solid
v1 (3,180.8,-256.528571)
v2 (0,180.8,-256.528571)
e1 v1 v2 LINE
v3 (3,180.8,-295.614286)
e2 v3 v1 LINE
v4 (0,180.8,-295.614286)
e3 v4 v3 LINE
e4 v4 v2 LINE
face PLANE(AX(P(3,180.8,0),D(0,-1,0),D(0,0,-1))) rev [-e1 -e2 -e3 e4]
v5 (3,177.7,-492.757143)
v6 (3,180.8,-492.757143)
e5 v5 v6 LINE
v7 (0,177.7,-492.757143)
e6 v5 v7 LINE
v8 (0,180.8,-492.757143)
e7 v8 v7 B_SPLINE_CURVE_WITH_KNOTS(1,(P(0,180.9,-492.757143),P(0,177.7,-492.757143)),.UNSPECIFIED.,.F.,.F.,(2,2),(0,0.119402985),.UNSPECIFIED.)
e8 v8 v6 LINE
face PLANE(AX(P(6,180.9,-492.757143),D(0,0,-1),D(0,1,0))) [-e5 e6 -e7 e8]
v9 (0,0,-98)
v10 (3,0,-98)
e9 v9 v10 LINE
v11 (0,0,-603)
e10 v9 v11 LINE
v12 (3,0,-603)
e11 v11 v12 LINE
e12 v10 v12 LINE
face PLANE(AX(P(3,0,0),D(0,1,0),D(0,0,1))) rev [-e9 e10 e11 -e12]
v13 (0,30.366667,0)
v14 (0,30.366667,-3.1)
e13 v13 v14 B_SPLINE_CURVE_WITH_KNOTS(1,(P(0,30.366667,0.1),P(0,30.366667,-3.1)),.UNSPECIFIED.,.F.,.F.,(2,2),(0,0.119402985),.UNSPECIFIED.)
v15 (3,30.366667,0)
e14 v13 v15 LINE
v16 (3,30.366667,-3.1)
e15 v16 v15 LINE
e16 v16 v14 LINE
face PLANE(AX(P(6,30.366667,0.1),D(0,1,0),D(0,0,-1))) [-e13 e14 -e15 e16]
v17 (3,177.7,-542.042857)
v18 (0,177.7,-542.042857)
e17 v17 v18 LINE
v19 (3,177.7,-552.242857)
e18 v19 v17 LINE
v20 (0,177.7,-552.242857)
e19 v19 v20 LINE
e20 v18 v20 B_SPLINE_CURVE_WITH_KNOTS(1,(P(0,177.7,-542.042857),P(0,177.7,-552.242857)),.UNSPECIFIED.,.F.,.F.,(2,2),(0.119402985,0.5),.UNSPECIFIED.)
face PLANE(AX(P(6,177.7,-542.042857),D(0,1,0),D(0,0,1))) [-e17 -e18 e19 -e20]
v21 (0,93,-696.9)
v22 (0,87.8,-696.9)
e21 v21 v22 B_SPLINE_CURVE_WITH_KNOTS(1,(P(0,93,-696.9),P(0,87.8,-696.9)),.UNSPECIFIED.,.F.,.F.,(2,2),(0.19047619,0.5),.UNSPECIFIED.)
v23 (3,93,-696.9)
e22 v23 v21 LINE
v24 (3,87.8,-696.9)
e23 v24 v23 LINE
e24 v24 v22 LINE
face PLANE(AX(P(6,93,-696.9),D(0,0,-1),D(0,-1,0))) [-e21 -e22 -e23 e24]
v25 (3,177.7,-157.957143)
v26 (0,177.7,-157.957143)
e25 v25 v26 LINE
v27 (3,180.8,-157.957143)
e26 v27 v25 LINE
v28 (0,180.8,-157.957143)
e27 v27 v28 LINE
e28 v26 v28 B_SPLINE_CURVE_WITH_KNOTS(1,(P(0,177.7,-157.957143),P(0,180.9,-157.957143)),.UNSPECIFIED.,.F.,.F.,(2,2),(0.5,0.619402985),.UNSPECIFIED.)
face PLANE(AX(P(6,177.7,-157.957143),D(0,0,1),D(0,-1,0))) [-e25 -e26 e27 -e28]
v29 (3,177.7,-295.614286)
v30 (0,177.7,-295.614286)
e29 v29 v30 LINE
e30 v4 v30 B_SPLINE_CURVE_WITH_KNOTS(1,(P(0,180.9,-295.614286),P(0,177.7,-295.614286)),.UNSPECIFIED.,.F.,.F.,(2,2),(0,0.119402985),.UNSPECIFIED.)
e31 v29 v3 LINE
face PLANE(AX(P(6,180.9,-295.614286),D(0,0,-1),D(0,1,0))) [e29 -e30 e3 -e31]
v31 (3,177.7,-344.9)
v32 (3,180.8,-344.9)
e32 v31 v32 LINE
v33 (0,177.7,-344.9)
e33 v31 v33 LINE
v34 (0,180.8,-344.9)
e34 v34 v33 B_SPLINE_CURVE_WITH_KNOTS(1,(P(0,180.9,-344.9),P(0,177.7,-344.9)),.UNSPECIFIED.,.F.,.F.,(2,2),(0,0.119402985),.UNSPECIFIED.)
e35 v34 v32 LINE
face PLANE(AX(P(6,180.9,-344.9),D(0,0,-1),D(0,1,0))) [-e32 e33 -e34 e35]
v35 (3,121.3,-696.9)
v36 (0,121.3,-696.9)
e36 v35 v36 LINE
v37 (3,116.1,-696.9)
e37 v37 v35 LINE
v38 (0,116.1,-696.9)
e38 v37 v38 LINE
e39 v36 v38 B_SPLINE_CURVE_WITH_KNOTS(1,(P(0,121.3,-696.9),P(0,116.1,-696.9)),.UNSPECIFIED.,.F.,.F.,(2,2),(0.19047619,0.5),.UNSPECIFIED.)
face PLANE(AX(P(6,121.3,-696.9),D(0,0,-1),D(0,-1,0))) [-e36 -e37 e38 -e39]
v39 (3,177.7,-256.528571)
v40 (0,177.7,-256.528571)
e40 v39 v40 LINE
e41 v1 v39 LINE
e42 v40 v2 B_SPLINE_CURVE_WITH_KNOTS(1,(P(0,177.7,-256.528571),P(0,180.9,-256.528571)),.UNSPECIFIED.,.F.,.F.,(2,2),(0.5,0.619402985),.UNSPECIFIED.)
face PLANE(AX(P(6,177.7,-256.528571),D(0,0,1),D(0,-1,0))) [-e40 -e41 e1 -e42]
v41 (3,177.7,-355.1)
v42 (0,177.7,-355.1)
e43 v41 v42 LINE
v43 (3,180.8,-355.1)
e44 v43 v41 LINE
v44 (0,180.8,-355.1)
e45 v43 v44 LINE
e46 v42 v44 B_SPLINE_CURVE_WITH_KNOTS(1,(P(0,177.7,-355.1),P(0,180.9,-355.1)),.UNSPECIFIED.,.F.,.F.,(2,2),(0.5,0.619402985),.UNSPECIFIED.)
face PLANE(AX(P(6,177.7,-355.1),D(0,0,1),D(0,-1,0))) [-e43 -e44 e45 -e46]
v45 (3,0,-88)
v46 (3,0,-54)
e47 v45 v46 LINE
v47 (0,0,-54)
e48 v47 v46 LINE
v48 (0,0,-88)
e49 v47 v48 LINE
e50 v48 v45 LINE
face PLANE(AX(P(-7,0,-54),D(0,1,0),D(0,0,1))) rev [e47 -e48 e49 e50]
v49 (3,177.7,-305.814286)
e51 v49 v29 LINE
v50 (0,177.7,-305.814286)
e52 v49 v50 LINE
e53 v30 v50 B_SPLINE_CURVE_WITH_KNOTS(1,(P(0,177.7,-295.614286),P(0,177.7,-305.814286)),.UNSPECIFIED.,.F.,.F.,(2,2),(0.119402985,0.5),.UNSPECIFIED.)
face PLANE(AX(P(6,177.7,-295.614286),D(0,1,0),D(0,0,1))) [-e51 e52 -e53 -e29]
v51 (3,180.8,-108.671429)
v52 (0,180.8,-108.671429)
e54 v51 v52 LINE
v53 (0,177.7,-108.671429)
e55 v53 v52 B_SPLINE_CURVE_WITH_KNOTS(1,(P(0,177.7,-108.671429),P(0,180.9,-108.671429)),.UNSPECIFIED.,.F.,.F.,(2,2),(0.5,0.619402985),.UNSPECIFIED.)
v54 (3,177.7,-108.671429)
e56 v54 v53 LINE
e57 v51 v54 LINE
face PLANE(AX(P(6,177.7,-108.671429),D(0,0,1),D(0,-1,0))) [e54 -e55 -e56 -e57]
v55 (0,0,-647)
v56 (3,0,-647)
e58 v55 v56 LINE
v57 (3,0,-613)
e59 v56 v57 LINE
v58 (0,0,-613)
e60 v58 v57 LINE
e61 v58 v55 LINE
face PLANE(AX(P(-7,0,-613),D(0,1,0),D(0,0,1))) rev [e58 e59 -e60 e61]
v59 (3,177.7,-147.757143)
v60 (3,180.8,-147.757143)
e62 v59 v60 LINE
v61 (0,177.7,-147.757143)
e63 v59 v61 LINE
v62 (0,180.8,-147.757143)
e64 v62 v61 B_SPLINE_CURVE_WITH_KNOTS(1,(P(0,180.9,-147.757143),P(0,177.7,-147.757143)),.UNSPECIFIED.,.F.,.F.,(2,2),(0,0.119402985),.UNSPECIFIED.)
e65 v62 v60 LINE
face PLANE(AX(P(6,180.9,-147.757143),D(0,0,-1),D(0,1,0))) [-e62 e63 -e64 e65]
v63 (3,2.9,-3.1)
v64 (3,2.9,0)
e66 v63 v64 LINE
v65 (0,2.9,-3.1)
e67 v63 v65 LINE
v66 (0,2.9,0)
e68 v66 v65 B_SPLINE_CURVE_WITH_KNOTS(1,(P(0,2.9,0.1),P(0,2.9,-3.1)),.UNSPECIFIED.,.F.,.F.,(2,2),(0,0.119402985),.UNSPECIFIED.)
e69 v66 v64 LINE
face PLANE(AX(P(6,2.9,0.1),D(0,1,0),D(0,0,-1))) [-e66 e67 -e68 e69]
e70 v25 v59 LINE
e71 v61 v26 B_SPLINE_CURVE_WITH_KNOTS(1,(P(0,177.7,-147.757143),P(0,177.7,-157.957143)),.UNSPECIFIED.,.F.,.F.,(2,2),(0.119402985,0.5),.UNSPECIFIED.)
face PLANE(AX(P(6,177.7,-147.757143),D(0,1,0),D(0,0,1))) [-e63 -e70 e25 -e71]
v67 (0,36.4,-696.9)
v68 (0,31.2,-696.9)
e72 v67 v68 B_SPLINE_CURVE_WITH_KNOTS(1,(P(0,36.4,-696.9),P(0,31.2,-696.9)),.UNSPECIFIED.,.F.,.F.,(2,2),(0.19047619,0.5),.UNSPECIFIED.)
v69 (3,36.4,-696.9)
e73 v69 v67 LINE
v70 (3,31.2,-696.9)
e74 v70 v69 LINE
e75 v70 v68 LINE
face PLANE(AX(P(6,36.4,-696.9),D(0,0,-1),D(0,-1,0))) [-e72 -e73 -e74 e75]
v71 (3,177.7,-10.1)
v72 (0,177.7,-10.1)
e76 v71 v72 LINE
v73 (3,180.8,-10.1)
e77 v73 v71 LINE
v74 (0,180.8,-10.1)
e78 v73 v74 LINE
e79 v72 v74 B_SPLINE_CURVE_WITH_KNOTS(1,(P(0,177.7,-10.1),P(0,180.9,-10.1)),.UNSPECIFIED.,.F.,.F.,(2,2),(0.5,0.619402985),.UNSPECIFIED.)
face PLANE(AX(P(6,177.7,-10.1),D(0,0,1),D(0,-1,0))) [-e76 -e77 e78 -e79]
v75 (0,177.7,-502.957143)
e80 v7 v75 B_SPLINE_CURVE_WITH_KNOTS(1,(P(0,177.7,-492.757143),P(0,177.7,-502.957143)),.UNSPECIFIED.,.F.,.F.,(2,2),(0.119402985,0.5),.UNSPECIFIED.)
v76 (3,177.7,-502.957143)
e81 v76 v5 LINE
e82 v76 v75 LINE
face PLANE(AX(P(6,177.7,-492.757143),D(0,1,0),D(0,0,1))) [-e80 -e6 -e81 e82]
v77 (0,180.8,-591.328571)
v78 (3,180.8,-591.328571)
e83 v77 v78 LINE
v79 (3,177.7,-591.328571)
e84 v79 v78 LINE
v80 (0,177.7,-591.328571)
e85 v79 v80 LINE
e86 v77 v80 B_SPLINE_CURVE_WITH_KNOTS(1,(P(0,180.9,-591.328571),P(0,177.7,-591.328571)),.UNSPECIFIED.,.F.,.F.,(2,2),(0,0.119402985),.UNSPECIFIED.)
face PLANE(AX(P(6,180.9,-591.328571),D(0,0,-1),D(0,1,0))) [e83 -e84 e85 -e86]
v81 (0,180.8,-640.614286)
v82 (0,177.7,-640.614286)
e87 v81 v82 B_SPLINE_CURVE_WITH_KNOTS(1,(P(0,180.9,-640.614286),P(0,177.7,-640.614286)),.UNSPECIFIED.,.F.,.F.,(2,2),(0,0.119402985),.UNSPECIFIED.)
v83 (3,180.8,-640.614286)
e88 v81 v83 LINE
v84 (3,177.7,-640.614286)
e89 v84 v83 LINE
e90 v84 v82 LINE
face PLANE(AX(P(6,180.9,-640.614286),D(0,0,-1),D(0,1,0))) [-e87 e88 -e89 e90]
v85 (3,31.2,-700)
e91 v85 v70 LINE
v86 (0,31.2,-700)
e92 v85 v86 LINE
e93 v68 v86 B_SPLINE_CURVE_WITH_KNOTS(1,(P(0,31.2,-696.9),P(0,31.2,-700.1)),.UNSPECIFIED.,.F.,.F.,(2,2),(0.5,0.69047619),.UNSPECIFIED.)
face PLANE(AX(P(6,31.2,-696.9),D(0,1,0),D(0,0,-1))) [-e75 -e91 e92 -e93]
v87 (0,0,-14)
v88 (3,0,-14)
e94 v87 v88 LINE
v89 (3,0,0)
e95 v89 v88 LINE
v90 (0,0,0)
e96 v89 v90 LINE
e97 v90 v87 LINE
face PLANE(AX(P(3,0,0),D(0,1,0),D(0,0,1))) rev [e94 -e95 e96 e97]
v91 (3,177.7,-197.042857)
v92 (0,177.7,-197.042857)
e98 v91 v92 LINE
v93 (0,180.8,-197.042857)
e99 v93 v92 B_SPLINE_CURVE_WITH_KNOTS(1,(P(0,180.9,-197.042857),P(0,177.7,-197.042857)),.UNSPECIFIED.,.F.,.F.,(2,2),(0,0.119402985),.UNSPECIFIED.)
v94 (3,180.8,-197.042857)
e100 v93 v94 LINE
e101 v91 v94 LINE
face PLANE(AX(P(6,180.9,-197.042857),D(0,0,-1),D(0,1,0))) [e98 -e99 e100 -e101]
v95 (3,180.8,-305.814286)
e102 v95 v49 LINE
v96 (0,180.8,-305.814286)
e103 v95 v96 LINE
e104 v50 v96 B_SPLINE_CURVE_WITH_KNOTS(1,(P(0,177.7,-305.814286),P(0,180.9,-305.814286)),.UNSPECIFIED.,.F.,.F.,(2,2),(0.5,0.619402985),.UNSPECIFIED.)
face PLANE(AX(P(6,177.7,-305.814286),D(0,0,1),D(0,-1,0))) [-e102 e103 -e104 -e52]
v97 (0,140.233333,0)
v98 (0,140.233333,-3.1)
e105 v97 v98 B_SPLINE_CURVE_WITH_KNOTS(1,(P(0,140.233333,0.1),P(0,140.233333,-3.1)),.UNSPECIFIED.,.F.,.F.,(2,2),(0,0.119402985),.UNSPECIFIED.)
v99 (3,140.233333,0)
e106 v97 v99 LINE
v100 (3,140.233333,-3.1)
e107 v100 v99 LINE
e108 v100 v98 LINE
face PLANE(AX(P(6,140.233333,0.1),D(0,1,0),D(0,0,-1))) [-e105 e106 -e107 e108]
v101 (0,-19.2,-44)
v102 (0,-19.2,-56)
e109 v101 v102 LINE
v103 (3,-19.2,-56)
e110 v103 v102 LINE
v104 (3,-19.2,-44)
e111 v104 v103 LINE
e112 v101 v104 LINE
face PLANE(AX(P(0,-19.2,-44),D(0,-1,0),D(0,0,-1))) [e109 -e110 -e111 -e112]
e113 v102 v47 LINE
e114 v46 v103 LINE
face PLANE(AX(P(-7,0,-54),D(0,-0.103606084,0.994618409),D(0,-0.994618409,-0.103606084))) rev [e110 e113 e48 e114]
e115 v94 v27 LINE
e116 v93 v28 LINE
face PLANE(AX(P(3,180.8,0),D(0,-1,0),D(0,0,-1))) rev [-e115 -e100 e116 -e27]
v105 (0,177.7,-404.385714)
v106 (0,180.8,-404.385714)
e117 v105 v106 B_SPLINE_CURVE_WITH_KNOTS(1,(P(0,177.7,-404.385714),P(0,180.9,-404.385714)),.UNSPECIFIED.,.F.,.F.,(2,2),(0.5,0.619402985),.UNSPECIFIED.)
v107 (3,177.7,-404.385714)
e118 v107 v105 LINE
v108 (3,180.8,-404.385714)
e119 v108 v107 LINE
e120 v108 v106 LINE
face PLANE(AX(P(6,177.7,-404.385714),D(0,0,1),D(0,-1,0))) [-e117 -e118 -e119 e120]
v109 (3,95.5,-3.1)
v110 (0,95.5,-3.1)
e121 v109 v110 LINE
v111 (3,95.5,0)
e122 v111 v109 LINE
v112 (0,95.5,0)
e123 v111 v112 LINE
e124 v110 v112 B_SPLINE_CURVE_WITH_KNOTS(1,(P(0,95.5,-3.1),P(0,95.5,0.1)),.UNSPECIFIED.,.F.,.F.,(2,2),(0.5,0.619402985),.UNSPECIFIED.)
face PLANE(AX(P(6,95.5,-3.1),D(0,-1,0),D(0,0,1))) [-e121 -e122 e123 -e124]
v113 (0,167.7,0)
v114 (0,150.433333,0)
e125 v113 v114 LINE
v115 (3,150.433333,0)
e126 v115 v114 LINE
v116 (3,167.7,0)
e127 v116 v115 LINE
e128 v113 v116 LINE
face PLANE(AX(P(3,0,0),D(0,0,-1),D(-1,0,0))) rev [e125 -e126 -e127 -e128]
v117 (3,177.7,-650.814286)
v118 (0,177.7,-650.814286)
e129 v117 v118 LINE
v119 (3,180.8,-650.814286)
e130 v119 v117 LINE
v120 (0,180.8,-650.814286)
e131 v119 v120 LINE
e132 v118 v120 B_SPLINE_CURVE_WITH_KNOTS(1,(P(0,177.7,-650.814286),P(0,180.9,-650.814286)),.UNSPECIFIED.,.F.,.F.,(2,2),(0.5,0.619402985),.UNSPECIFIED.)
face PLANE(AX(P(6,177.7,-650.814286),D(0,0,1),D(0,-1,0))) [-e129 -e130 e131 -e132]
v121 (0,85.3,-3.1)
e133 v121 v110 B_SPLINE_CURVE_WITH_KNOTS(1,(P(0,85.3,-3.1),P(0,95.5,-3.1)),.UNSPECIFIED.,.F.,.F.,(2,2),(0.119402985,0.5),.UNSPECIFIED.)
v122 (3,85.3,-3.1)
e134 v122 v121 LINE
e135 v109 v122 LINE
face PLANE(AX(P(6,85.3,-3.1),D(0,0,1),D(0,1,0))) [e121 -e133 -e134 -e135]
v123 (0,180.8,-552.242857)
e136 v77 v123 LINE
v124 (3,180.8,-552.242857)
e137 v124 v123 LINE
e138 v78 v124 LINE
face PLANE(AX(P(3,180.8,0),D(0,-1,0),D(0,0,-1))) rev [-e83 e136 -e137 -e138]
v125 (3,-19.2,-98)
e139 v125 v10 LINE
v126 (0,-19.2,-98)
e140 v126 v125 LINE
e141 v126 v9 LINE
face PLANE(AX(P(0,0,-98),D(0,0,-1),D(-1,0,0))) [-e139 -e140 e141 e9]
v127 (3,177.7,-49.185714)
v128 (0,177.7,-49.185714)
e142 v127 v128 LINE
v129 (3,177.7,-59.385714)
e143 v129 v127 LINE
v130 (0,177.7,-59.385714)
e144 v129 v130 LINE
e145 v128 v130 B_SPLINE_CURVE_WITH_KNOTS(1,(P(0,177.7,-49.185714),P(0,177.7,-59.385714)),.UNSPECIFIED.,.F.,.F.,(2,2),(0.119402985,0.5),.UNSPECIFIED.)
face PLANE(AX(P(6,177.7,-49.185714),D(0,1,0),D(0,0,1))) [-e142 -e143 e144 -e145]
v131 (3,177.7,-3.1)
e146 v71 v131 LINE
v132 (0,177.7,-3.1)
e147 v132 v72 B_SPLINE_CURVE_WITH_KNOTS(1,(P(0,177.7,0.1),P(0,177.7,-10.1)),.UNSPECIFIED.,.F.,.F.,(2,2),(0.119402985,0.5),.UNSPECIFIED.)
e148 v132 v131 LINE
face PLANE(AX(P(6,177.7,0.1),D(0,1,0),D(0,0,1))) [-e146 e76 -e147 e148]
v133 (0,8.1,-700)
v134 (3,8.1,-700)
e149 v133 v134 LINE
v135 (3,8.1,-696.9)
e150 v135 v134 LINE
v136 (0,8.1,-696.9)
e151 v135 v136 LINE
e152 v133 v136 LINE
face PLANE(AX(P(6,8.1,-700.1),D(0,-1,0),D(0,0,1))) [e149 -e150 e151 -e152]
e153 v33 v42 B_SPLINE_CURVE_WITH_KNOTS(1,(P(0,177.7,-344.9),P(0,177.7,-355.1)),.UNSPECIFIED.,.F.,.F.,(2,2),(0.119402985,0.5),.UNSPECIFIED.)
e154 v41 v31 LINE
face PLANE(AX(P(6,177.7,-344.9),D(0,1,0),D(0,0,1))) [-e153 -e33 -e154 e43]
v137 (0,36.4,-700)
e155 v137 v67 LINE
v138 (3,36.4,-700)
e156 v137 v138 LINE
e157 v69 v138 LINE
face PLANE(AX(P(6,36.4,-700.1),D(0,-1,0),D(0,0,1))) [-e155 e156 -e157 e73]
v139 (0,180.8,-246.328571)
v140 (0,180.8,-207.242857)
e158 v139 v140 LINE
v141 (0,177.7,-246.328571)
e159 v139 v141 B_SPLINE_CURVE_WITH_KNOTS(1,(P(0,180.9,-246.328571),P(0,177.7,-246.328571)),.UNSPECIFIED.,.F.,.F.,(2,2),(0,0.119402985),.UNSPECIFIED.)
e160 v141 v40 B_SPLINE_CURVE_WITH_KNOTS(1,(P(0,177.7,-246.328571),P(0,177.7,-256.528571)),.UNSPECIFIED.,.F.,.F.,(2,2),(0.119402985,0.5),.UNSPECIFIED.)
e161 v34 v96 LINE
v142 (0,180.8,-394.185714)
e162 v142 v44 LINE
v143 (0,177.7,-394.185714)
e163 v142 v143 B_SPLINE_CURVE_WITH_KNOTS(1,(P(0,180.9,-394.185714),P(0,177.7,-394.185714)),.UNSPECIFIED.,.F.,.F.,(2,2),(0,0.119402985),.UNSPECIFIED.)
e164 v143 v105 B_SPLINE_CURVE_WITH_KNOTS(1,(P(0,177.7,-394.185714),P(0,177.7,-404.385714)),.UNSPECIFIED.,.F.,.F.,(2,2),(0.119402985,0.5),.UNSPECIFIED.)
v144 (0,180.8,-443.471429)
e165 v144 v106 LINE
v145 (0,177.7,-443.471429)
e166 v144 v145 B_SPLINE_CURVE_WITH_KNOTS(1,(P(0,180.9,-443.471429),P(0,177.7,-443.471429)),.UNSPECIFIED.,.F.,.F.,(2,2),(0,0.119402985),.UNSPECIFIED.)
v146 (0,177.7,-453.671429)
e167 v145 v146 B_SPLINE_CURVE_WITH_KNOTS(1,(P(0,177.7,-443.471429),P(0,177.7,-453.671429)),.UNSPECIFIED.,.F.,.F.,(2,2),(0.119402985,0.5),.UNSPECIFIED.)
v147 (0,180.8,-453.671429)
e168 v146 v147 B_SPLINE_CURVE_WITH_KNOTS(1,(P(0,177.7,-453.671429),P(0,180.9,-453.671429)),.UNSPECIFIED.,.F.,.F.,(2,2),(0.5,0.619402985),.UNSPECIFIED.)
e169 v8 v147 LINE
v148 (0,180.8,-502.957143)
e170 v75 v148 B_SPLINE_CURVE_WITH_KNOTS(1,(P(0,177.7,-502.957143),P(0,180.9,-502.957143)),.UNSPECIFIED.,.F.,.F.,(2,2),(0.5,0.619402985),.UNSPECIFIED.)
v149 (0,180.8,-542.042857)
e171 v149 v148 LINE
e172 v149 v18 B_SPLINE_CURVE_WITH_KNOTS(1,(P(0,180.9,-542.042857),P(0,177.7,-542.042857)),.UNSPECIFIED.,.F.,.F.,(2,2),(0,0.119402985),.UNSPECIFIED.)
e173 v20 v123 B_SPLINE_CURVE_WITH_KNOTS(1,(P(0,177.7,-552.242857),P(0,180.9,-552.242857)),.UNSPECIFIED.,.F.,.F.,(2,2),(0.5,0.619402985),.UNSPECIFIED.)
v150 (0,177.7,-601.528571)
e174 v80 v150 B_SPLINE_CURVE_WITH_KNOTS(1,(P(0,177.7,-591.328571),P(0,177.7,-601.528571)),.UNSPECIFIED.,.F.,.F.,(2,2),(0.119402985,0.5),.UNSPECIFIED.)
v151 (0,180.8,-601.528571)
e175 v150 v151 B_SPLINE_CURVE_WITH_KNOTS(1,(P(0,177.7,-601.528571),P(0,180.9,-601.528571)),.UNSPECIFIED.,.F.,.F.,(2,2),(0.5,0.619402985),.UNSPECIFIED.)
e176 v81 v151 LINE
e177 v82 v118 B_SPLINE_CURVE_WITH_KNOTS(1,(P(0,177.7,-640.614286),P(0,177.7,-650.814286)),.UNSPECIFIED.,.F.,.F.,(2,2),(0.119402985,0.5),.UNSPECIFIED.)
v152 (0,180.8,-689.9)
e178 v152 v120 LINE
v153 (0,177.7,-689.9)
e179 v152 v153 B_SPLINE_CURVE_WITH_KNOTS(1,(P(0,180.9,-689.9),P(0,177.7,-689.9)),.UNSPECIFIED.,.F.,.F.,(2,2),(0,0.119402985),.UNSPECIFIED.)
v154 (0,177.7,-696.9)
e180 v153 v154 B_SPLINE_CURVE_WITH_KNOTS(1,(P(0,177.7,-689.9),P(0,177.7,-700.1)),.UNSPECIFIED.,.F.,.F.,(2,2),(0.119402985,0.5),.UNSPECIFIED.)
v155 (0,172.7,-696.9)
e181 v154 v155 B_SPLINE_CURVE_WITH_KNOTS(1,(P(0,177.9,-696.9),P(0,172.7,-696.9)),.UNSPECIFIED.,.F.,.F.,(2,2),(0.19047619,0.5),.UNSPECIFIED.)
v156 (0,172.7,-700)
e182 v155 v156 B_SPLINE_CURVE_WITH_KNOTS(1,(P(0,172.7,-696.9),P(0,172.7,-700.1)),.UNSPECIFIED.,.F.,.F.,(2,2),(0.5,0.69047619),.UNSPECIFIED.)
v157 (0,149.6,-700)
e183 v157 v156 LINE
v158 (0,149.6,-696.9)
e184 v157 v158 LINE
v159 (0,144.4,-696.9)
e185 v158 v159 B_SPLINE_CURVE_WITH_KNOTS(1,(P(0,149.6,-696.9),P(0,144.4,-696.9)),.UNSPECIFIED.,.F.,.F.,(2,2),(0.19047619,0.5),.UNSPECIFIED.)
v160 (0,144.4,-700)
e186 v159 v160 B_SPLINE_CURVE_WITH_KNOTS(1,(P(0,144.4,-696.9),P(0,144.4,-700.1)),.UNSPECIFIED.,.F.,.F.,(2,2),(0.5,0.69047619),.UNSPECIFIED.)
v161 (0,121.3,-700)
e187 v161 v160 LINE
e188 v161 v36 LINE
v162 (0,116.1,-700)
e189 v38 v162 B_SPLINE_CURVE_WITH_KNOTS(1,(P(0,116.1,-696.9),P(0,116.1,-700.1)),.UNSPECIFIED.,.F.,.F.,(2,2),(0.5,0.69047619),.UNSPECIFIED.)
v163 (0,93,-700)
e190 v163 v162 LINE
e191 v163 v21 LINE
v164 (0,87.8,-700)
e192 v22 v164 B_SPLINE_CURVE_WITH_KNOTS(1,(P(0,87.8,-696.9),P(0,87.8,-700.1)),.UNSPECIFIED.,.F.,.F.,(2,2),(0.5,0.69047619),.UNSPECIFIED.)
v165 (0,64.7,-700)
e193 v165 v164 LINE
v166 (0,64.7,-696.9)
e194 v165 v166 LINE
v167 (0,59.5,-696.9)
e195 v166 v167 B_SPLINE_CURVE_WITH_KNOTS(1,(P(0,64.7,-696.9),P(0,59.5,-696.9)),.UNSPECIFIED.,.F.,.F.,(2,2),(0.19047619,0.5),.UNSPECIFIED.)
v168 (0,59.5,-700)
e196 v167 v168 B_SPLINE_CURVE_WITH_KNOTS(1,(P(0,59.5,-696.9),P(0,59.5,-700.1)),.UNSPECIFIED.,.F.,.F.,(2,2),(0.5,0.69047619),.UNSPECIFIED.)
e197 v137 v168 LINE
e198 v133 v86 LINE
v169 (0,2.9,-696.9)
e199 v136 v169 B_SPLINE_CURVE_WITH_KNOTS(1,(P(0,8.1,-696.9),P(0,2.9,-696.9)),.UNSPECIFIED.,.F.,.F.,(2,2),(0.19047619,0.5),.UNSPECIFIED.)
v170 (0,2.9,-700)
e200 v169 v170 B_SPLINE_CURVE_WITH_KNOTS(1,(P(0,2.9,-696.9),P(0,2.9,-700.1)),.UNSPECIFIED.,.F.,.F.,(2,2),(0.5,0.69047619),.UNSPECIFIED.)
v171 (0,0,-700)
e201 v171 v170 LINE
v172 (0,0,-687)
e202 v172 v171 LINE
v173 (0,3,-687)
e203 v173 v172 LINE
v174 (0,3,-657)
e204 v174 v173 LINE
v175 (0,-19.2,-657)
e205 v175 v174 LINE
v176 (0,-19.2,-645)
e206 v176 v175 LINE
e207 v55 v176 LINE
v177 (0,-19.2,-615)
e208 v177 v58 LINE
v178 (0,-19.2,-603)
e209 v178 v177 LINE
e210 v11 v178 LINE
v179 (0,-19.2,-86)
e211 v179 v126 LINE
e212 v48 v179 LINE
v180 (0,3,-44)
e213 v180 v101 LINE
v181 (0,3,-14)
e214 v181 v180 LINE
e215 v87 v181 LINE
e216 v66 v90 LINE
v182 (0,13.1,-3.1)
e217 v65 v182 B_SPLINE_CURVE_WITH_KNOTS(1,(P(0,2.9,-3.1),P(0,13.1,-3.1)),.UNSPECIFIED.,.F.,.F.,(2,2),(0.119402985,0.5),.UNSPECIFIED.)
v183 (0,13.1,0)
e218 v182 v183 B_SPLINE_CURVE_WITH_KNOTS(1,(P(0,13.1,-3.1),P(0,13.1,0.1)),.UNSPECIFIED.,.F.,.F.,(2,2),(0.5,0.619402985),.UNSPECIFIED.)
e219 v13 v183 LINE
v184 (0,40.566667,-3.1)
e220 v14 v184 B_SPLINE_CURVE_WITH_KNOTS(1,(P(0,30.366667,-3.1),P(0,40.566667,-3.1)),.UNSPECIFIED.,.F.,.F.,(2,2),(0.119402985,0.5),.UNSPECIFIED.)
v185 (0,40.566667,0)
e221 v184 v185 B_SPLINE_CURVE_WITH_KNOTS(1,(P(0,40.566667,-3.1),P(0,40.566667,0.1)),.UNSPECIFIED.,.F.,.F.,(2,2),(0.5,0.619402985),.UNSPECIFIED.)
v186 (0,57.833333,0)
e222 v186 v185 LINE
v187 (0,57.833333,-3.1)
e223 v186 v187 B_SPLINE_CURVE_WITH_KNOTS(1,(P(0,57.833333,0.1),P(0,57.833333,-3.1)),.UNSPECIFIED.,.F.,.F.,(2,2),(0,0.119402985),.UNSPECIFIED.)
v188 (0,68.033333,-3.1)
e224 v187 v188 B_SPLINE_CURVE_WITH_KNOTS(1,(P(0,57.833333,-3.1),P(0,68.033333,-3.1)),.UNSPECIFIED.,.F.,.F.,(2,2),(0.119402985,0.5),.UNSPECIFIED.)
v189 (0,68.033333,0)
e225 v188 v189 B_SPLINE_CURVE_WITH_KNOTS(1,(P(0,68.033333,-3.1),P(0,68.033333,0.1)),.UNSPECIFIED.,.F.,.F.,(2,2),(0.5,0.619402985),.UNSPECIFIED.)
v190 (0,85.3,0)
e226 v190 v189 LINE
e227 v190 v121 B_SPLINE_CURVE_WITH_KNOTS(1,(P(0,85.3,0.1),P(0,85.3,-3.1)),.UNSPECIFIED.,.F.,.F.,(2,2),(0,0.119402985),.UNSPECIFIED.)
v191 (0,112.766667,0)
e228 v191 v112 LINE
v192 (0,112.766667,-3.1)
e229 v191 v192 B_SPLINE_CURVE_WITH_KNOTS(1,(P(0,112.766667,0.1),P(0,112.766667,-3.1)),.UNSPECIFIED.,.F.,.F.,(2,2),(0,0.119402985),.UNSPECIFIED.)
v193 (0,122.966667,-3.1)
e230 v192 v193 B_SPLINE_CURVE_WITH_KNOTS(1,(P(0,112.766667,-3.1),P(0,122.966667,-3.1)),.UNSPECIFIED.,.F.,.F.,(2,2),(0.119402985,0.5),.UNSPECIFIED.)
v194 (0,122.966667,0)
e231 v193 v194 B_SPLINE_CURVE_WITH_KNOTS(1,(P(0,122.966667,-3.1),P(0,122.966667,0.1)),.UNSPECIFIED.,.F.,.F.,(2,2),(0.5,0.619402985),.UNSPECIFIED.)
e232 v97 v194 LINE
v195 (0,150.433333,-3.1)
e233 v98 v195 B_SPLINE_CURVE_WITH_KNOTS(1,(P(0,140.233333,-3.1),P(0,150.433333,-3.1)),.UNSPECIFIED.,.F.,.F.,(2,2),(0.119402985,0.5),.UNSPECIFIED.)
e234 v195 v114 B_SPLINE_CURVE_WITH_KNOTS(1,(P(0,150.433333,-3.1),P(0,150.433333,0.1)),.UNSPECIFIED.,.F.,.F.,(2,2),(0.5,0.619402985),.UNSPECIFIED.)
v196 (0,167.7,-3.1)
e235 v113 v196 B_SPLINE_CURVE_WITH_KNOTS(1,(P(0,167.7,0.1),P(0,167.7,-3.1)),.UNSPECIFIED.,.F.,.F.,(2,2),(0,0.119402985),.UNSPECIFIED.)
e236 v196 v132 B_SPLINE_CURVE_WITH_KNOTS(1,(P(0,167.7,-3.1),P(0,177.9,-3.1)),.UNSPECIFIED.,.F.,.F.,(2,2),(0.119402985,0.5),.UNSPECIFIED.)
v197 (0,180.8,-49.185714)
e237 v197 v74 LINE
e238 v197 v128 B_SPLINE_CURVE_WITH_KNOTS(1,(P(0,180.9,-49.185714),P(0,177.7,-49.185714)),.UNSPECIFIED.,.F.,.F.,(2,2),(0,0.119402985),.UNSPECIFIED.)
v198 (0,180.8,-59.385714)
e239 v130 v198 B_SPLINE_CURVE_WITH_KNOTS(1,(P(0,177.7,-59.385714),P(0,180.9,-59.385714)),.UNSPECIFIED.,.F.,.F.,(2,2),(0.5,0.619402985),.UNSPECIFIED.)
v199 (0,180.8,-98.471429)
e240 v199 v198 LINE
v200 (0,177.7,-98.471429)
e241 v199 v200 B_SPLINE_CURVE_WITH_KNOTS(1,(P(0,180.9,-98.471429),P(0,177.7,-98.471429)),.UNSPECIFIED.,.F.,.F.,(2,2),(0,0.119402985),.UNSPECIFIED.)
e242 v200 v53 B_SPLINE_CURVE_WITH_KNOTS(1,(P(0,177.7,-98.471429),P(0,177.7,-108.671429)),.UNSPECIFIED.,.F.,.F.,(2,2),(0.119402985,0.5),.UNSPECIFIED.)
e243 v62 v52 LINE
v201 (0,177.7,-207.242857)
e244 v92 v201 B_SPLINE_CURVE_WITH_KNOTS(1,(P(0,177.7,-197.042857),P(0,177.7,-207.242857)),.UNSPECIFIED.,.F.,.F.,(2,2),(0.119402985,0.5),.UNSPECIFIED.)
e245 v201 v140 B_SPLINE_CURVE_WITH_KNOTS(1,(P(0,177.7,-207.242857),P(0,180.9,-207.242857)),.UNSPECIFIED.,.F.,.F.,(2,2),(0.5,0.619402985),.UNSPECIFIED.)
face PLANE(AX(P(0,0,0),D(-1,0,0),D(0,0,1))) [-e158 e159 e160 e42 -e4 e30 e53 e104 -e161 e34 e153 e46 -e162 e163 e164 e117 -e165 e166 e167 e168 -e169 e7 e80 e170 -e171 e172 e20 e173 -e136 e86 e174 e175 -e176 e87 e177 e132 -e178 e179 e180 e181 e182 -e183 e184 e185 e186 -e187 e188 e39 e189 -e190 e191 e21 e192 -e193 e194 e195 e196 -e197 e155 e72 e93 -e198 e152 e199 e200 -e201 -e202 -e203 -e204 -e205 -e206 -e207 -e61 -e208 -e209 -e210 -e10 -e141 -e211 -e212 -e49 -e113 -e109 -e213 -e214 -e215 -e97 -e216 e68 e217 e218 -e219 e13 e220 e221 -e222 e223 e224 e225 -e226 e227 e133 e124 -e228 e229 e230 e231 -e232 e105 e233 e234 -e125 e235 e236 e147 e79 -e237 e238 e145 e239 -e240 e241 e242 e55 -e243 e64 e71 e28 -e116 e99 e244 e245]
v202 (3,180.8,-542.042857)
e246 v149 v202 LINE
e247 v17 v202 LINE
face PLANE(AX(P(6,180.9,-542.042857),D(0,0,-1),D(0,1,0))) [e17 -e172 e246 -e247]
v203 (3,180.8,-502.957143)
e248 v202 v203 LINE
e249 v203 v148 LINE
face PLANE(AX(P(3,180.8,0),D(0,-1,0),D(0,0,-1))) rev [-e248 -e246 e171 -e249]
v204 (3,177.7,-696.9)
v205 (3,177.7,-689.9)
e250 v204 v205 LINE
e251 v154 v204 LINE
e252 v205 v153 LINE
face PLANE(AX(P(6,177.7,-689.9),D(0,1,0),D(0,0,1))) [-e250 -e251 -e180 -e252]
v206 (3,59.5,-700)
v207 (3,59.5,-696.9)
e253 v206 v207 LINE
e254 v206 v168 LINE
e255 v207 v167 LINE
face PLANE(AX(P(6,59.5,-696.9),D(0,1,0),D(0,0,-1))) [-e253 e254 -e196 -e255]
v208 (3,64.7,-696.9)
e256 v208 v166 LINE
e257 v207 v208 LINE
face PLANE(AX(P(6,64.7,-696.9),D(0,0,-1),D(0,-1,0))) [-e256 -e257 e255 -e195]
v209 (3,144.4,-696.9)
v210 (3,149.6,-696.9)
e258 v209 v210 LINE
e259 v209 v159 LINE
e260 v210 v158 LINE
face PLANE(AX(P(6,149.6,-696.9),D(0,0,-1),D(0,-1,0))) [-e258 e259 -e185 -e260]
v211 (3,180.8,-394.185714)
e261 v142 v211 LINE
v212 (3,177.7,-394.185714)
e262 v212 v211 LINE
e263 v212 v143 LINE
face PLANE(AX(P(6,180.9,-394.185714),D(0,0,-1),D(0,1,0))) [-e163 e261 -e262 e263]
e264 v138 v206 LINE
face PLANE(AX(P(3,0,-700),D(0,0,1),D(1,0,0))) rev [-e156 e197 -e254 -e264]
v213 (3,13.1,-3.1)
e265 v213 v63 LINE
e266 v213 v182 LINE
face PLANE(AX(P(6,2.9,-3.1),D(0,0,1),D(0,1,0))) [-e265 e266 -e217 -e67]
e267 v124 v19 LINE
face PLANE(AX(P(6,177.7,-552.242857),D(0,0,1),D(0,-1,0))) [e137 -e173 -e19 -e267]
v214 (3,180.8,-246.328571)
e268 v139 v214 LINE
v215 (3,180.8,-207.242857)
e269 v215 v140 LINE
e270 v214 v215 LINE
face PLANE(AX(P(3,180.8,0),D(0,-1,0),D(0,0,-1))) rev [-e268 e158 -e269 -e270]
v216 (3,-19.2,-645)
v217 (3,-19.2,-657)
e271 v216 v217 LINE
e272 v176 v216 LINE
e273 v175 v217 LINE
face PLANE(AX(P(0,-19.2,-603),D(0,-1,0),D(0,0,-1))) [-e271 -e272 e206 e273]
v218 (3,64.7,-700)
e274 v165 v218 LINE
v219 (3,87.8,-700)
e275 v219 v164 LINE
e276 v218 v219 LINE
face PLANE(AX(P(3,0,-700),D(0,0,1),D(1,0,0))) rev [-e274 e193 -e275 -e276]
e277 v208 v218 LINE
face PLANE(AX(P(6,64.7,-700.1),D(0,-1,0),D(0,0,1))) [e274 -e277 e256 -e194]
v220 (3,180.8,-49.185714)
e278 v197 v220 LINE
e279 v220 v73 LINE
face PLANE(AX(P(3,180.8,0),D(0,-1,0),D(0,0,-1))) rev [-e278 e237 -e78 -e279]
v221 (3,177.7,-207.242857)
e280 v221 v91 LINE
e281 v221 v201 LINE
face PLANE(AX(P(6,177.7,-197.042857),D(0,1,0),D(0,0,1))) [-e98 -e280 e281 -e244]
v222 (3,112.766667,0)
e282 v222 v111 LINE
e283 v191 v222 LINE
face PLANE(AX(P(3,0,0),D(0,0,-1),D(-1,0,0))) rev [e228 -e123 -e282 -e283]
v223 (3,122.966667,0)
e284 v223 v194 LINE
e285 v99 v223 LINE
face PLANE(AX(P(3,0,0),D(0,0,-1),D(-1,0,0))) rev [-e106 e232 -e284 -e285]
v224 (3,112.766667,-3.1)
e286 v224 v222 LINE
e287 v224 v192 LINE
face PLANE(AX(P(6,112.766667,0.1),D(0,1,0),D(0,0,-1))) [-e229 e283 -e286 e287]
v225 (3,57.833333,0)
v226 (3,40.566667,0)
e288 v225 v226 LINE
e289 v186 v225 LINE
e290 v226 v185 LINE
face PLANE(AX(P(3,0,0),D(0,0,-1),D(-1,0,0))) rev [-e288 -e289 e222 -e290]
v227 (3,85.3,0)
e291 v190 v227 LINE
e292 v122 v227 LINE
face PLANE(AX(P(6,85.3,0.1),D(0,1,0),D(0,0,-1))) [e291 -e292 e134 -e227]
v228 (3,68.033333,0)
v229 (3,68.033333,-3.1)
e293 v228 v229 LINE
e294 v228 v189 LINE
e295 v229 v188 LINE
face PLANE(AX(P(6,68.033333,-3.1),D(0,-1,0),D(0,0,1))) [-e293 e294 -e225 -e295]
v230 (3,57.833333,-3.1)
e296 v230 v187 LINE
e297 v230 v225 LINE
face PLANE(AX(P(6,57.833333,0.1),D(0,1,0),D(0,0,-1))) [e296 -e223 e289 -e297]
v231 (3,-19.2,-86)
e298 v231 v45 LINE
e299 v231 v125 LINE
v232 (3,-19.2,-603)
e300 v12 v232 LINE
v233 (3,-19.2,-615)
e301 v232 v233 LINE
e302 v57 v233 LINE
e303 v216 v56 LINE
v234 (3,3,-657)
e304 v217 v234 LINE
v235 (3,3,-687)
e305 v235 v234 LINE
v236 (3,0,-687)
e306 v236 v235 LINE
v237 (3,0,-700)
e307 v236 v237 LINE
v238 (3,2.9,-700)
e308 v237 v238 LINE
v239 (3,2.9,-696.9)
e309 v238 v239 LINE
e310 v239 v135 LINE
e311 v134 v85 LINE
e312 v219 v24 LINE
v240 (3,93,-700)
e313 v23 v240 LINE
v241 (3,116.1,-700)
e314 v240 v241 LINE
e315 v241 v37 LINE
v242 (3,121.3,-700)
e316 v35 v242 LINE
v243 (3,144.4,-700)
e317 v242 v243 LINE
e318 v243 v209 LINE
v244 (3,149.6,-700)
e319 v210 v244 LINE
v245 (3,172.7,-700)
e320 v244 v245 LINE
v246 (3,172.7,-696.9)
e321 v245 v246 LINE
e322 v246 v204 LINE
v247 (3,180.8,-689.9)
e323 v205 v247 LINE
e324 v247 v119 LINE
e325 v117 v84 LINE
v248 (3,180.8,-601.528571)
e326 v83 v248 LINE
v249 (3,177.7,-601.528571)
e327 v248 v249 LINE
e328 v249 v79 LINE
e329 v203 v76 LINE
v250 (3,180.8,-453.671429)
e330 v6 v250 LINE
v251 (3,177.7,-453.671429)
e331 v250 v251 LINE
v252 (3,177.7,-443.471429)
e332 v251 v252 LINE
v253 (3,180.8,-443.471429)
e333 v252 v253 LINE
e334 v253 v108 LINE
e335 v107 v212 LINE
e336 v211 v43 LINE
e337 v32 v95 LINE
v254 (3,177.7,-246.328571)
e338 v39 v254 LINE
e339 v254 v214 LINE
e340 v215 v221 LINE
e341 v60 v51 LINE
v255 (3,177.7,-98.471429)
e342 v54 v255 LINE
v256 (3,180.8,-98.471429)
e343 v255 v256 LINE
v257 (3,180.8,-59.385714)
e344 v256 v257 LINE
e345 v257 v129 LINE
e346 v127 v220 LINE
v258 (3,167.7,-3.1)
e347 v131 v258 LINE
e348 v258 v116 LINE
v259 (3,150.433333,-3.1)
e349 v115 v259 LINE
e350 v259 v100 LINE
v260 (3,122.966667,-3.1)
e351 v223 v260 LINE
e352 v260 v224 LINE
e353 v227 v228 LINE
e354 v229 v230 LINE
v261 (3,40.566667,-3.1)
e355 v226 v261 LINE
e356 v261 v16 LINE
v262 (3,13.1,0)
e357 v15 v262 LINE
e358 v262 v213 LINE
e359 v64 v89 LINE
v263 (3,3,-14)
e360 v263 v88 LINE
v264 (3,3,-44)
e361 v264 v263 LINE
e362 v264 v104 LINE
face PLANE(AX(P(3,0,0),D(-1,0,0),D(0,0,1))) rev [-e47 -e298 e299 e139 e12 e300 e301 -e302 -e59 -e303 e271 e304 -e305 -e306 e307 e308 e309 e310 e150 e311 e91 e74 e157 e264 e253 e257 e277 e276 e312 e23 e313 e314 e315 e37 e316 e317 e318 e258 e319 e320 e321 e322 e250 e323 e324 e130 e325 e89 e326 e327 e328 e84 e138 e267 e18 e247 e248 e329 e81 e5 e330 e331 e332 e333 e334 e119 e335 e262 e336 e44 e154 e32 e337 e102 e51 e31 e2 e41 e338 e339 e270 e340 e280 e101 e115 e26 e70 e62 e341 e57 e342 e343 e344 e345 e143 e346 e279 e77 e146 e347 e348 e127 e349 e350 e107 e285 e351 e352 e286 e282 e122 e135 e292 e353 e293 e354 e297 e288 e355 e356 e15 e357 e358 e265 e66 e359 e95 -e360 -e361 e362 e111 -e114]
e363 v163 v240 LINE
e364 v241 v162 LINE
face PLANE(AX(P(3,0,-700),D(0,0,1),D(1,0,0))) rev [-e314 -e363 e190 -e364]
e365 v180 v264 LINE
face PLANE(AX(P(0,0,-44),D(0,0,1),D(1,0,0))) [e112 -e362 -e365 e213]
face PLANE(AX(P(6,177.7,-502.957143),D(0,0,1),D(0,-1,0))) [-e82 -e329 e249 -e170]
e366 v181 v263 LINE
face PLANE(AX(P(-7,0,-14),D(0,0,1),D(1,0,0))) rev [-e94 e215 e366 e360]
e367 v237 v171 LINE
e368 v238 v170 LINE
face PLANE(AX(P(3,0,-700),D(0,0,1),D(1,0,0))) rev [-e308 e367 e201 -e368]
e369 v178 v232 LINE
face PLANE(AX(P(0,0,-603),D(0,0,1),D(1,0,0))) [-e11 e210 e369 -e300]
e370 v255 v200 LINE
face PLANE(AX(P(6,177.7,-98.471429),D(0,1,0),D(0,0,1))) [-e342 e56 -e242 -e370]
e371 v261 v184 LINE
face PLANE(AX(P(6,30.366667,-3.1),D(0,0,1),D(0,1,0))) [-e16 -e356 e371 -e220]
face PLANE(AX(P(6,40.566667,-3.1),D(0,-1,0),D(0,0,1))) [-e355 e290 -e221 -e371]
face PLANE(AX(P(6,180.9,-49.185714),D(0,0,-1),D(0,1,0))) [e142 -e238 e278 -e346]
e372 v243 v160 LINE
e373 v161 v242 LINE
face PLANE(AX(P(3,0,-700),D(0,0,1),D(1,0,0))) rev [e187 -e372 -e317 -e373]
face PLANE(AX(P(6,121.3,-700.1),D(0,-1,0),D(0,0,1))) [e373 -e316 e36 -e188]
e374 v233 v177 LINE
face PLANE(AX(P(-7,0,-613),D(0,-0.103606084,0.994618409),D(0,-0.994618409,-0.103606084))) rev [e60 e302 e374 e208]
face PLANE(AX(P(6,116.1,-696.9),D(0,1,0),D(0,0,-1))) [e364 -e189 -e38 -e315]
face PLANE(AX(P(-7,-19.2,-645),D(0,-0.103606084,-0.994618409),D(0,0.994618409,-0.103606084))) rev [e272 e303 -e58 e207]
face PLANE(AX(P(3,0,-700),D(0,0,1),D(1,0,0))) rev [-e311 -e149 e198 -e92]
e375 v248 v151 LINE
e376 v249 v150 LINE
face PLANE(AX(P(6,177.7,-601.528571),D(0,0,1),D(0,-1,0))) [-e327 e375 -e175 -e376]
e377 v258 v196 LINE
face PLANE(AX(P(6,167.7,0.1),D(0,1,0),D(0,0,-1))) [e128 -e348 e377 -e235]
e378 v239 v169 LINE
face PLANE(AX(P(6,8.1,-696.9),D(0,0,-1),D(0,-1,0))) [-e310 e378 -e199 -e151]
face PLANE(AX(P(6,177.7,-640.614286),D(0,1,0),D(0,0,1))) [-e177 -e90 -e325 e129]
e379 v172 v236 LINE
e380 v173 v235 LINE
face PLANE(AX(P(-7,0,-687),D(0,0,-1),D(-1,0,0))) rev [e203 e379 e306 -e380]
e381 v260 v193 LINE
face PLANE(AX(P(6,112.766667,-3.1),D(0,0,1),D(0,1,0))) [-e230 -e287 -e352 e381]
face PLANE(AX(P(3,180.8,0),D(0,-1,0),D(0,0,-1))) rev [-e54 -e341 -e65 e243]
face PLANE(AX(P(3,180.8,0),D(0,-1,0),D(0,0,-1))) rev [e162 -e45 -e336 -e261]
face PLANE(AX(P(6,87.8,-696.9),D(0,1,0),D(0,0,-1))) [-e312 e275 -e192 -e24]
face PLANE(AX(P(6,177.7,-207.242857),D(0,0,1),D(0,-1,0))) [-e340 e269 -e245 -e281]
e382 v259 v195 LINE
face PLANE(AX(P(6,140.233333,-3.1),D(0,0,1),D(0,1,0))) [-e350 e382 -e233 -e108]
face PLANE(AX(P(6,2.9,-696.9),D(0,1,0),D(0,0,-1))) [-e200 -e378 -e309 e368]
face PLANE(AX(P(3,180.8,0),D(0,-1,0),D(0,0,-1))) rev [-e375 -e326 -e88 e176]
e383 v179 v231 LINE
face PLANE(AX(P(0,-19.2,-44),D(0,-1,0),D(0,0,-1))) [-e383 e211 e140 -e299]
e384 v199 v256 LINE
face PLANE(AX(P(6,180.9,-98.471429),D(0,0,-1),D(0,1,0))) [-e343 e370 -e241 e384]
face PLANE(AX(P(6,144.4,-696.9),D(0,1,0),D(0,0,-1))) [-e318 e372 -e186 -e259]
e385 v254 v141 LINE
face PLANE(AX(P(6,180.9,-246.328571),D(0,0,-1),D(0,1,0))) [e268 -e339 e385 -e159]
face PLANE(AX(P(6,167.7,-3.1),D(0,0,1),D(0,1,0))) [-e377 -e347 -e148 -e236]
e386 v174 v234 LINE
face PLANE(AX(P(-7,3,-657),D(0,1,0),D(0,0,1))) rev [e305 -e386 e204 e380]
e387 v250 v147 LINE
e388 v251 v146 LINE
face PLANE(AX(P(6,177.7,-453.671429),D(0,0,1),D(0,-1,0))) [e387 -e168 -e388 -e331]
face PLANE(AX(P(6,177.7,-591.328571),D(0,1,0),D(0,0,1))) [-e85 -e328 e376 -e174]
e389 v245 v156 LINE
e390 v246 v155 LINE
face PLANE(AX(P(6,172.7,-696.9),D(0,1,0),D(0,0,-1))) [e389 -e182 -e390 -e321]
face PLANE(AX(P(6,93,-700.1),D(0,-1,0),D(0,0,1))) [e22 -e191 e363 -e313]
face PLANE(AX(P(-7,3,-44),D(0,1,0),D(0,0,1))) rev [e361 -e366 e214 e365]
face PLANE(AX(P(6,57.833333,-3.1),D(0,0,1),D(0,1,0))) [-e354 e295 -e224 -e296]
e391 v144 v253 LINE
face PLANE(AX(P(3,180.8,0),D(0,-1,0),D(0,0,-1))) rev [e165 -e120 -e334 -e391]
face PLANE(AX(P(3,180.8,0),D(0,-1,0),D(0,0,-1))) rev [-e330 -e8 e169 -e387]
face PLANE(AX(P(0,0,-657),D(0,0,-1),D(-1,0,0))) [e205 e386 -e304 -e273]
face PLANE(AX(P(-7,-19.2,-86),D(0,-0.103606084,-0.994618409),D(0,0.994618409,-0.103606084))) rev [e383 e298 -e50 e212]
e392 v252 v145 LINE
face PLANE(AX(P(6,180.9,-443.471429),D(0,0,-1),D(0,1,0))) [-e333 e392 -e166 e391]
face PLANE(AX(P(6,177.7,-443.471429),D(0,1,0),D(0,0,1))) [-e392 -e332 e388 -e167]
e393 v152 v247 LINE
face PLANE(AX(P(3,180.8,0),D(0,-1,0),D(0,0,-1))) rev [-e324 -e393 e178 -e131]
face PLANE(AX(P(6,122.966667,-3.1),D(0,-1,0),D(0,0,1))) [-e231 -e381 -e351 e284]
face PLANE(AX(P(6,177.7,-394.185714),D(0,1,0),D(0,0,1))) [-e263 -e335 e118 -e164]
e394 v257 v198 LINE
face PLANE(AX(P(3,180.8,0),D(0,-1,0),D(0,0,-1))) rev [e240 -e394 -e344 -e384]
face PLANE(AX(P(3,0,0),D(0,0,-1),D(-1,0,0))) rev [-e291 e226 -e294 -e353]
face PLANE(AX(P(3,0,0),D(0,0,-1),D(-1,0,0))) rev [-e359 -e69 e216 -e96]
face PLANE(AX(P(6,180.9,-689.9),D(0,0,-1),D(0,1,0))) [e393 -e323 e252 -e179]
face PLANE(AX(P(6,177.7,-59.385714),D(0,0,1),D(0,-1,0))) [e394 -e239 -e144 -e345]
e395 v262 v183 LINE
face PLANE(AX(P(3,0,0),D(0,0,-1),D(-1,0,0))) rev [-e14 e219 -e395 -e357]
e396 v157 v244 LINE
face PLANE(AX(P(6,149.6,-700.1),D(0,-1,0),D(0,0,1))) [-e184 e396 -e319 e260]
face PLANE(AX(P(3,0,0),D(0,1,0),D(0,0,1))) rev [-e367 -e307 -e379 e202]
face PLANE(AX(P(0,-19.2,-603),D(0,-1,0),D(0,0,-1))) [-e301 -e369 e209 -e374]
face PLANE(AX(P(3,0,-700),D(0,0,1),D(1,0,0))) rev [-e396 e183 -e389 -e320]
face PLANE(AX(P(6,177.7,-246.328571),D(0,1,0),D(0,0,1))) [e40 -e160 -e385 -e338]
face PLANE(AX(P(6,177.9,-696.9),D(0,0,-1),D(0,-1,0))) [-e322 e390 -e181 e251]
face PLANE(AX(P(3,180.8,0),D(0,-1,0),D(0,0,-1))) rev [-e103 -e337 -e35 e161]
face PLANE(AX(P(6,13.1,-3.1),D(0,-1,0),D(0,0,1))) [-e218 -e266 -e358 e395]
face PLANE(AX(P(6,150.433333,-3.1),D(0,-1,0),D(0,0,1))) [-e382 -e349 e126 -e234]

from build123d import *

# Parameters (mm, degrees)
SKETCH1_W                      = 700
SKETCH1_H                      = 180.8
BOSS_EXTRUDE1_DEPTH            = 3
SKETCH2_W                      = 54
SKETCH2_H                      = 19.2
BOSS_EXTRUDE2_DEPTH            = 3
CUT_EXTRUDE1_DEPTH             = 10
CUT_EXTRUDE2_DEPTH             = 10
SKETCH5_W                      = 30
SKETCH5_H                      = 3
CUT_EXTRUDE3_DEPTH             = 10
SKETCH9_W                      = 30
SKETCH9_H                      = 3
CUT_EXTRUDE6_DEPTH             = 10
TAB_START                      = 2.9
TAB_AND_SLOT_SLOT3_OUTLINE_W   = 3
TAB_AND_SLOT_SLOT3_OUTLINE_H   = 3.1
TAB_AND_SLOT_SLOT3_DEPTH       = 5.2
TAB_START_2                    = 31.2
TAB_AND_SLOT_SLOT3_2_OUTLINE_W = 3
TAB_AND_SLOT_SLOT3_2_OUTLINE_H = 3.1
TAB_AND_SLOT_SLOT3_2_DEPTH     = 5.2
TAB_START_3                    = 59.5
TAB_AND_SLOT_SLOT3_3_OUTLINE_W = 3
TAB_AND_SLOT_SLOT3_3_OUTLINE_H = 3.1
TAB_AND_SLOT_SLOT3_3_DEPTH     = 5.2
TAB_START_4                    = 87.8
TAB_AND_SLOT_SLOT3_4_OUTLINE_W = 3
TAB_AND_SLOT_SLOT3_4_OUTLINE_H = 3.1
TAB_AND_SLOT_SLOT3_4_DEPTH     = 5.2
TAB_START_5                    = 116.1
TAB_AND_SLOT_SLOT3_5_OUTLINE_W = 3
TAB_AND_SLOT_SLOT3_5_OUTLINE_H = 3.1
TAB_AND_SLOT_SLOT3_5_DEPTH     = 5.2
TAB_START_6                    = 144.4
TAB_AND_SLOT_SLOT3_6_OUTLINE_W = 3
TAB_AND_SLOT_SLOT3_6_OUTLINE_H = 3.1
TAB_AND_SLOT_SLOT3_6_DEPTH     = 5.2
TAB_START_7                    = 172.7
TAB_AND_SLOT_SLOT3_7_OUTLINE_W = 3
TAB_AND_SLOT_SLOT3_7_OUTLINE_H = 3.1
TAB_AND_SLOT_SLOT3_7_DEPTH     = 5.2
TAB_START_8                    = 177.7
TAB_AND_SLOT_SLOT4_OUTLINE_W   = 3
TAB_AND_SLOT_SLOT4_OUTLINE_H   = 10.1
TAB_AND_SLOT_SLOT4_OUTLINE_H_2 = 10.2
TAB_AND_SLOT_SLOT4_DEPTH       = 3.1
TAB_AND_SLOT_SLOT5_DEPTH       = 10.2
TAB_START_9                    = 30.366666667
TAB_AND_SLOT_SLOT5_2_DEPTH     = 10.2
TAB_START_10                   = 57.833333333
TAB_AND_SLOT_SLOT5_3_DEPTH     = 10.2
TAB_START_11                   = 85.3
TAB_AND_SLOT_SLOT5_4_DEPTH     = 10.2
TAB_START_12                   = 112.766666667
TAB_AND_SLOT_SLOT5_5_DEPTH     = 10.2
TAB_START_13                   = 140.233333333
TAB_AND_SLOT_SLOT5_6_DEPTH     = 10.2
TAB_START_14                   = 167.7
TAB_AND_SLOT_SLOT5_7_DEPTH     = 10


# Read off the part's stored shape, not the designer's step: Tab and Slot-Slot3, Tab and Slot-Slot4, Tab and Slot-Slot5
with BuildPart() as part:
    # Sketch1 → Boss-Extrude1 (new body)
    with BuildSketch(Plane(origin=(0, 0, 0), x_dir=(0, 0, -1), z_dir=(1, 0, 0))):
        with Locations((350, 90.4)):
            Rectangle(SKETCH1_W, SKETCH1_H)
    extrude(amount=BOSS_EXTRUDE1_DEPTH)

    # Sketch2 → Boss-Extrude2 (add)
    with BuildSketch(Plane(origin=(3, 0, 0), x_dir=(0, 0, -1), z_dir=(1, 0, 0))):
        with Locations((71, -9.6)):
            Rectangle(SKETCH2_W, SKETCH2_H)
        with Locations((630, -9.6)):
            Rectangle(SKETCH2_W, SKETCH2_H)
    extrude(amount=-BOSS_EXTRUDE2_DEPTH)

    # Sketch3 → Cut-Extrude1 (cut)
    with BuildSketch(Plane(origin=(3, 0, 0), x_dir=(0, 0, -1), z_dir=(1, 0, 0))):
        Polygon((54, 0), (88, 0), (86, -19.2), (56, -19.2), align=None)
    extrude(amount=-CUT_EXTRUDE1_DEPTH, mode=Mode.SUBTRACT)

    # Sketch4 → Cut-Extrude2 (cut)
    with BuildSketch(Plane(origin=(3, 0, 0), x_dir=(0, 0, -1), z_dir=(1, 0, 0))):
        Polygon((613, 0), (647, 0), (645, -19.2), (615, -19.2), align=None)
    extrude(amount=-CUT_EXTRUDE2_DEPTH, mode=Mode.SUBTRACT)

    # Sketch5 → Cut-Extrude3 (cut)
    with BuildSketch(Plane(origin=(3, 0, 0), x_dir=(0, 0, -1), z_dir=(1, 0, 0))):
        with Locations((672, 1.5)):
            Rectangle(SKETCH5_W, SKETCH5_H)
    extrude(amount=-CUT_EXTRUDE3_DEPTH, mode=Mode.SUBTRACT)

    # Sketch9 → Cut-Extrude6 (cut)
    with BuildSketch(Plane(origin=(3, 0, 0), x_dir=(0, 0, -1), z_dir=(1, 0, 0))):
        with Locations((29, 1.5)):
            Rectangle(SKETCH9_W, SKETCH9_H)
    extrude(amount=-CUT_EXTRUDE6_DEPTH, mode=Mode.SUBTRACT)

    # Tab and Slot-Slot3 outline → Tab and Slot-Slot3 (cut)
    with BuildSketch(Plane(origin=(0, 0, 0), x_dir=(1, 0, 0), z_dir=(0, 1, 0)).offset(TAB_START)):
        with Locations((1.5, 698.45)):
            Rectangle(TAB_AND_SLOT_SLOT3_OUTLINE_W, TAB_AND_SLOT_SLOT3_OUTLINE_H)
    extrude(amount=TAB_AND_SLOT_SLOT3_DEPTH, mode=Mode.SUBTRACT)

    # Tab and Slot-Slot3 2 outline → Tab and Slot-Slot3 2 (cut)
    with BuildSketch(Plane(origin=(0, 0, 0), x_dir=(1, 0, 0), z_dir=(0, 1, 0)).offset(TAB_START_2)):
        with Locations((1.5, 698.45)):
            Rectangle(TAB_AND_SLOT_SLOT3_2_OUTLINE_W, TAB_AND_SLOT_SLOT3_2_OUTLINE_H)
    extrude(amount=TAB_AND_SLOT_SLOT3_2_DEPTH, mode=Mode.SUBTRACT)

    # Tab and Slot-Slot3 3 outline → Tab and Slot-Slot3 3 (cut)
    with BuildSketch(Plane(origin=(0, 0, 0), x_dir=(1, 0, 0), z_dir=(0, 1, 0)).offset(TAB_START_3)):
        with Locations((1.5, 698.45)):
            Rectangle(TAB_AND_SLOT_SLOT3_3_OUTLINE_W, TAB_AND_SLOT_SLOT3_3_OUTLINE_H)
    extrude(amount=TAB_AND_SLOT_SLOT3_3_DEPTH, mode=Mode.SUBTRACT)

    # Tab and Slot-Slot3 4 outline → Tab and Slot-Slot3 4 (cut)
    with BuildSketch(Plane(origin=(0, 0, 0), x_dir=(1, 0, 0), z_dir=(0, 1, 0)).offset(TAB_START_4)):
        with Locations((1.5, 698.45)):
            Rectangle(TAB_AND_SLOT_SLOT3_4_OUTLINE_W, TAB_AND_SLOT_SLOT3_4_OUTLINE_H)
    extrude(amount=TAB_AND_SLOT_SLOT3_4_DEPTH, mode=Mode.SUBTRACT)

    # Tab and Slot-Slot3 5 outline → Tab and Slot-Slot3 5 (cut)
    with BuildSketch(Plane(origin=(0, 0, 0), x_dir=(1, 0, 0), z_dir=(0, 1, 0)).offset(TAB_START_5)):
        with Locations((1.5, 698.45)):
            Rectangle(TAB_AND_SLOT_SLOT3_5_OUTLINE_W, TAB_AND_SLOT_SLOT3_5_OUTLINE_H)
    extrude(amount=TAB_AND_SLOT_SLOT3_5_DEPTH, mode=Mode.SUBTRACT)

    # Tab and Slot-Slot3 6 outline → Tab and Slot-Slot3 6 (cut)
    with BuildSketch(Plane(origin=(0, 0, 0), x_dir=(1, 0, 0), z_dir=(0, 1, 0)).offset(TAB_START_6)):
        with Locations((1.5, 698.45)):
            Rectangle(TAB_AND_SLOT_SLOT3_6_OUTLINE_W, TAB_AND_SLOT_SLOT3_6_OUTLINE_H)
    extrude(amount=TAB_AND_SLOT_SLOT3_6_DEPTH, mode=Mode.SUBTRACT)

    # Tab and Slot-Slot3 7 outline → Tab and Slot-Slot3 7 (cut)
    with BuildSketch(Plane(origin=(0, 0, 0), x_dir=(1, 0, 0), z_dir=(0, 1, 0)).offset(TAB_START_7)):
        with Locations((1.5, 698.45)):
            Rectangle(TAB_AND_SLOT_SLOT3_7_OUTLINE_W, TAB_AND_SLOT_SLOT3_7_OUTLINE_H)
    extrude(amount=TAB_AND_SLOT_SLOT3_7_DEPTH, mode=Mode.SUBTRACT)

    # Tab and Slot-Slot4 outline → Tab and Slot-Slot4 (cut)
    with BuildSketch(Plane(origin=(0, 0, 0), x_dir=(1, 0, 0), z_dir=(0, 1, 0)).offset(TAB_START_8)):
        with Locations((1.5, 694.95)):
            Rectangle(TAB_AND_SLOT_SLOT4_OUTLINE_W, TAB_AND_SLOT_SLOT4_OUTLINE_H)
        with Locations((1.5, 645.714285714)):
            Rectangle(TAB_AND_SLOT_SLOT4_OUTLINE_W, TAB_AND_SLOT_SLOT4_OUTLINE_H_2)
        with Locations((1.5, 596.428571429)):
            Rectangle(TAB_AND_SLOT_SLOT4_OUTLINE_W, TAB_AND_SLOT_SLOT4_OUTLINE_H_2)
        with Locations((1.5, 547.142857143)):
            Rectangle(TAB_AND_SLOT_SLOT4_OUTLINE_W, TAB_AND_SLOT_SLOT4_OUTLINE_H_2)
        with Locations((1.5, 497.857142857)):
            Rectangle(TAB_AND_SLOT_SLOT4_OUTLINE_W, TAB_AND_SLOT_SLOT4_OUTLINE_H_2)
        with Locations((1.5, 448.571428571)):
            Rectangle(TAB_AND_SLOT_SLOT4_OUTLINE_W, TAB_AND_SLOT_SLOT4_OUTLINE_H_2)
        with Locations((1.5, 399.285714286)):
            Rectangle(TAB_AND_SLOT_SLOT4_OUTLINE_W, TAB_AND_SLOT_SLOT4_OUTLINE_H_2)
        with Locations((1.5, 350)):
            Rectangle(TAB_AND_SLOT_SLOT4_OUTLINE_W, TAB_AND_SLOT_SLOT4_OUTLINE_H_2)
        with Locations((1.5, 300.714285714)):
            Rectangle(TAB_AND_SLOT_SLOT4_OUTLINE_W, TAB_AND_SLOT_SLOT4_OUTLINE_H_2)
        with Locations((1.5, 251.428571429)):
            Rectangle(TAB_AND_SLOT_SLOT4_OUTLINE_W, TAB_AND_SLOT_SLOT4_OUTLINE_H_2)
        with Locations((1.5, 202.142857143)):
            Rectangle(TAB_AND_SLOT_SLOT4_OUTLINE_W, TAB_AND_SLOT_SLOT4_OUTLINE_H_2)
        with Locations((1.5, 152.857142857)):
            Rectangle(TAB_AND_SLOT_SLOT4_OUTLINE_W, TAB_AND_SLOT_SLOT4_OUTLINE_H_2)
        with Locations((1.5, 103.571428571)):
            Rectangle(TAB_AND_SLOT_SLOT4_OUTLINE_W, TAB_AND_SLOT_SLOT4_OUTLINE_H_2)
        with Locations((1.5, 54.285714286)):
            Rectangle(TAB_AND_SLOT_SLOT4_OUTLINE_W, TAB_AND_SLOT_SLOT4_OUTLINE_H_2)
        with Locations((1.5, 5.05)):
            Rectangle(TAB_AND_SLOT_SLOT4_OUTLINE_W, TAB_AND_SLOT_SLOT4_OUTLINE_H)
    extrude(amount=TAB_AND_SLOT_SLOT4_DEPTH, mode=Mode.SUBTRACT)

    # Tab and Slot-Slot5 outline → Tab and Slot-Slot5 (cut)
    with BuildSketch(Plane(origin=(0, 0, 0), x_dir=(1, 0, 0), z_dir=(0, 1, 0)).offset(TAB_START)):
        Polygon((3, 3.1), (1.28e-07, 3.1), (0, 0), (3, 0), align=None)
    extrude(amount=TAB_AND_SLOT_SLOT5_DEPTH, mode=Mode.SUBTRACT)

    # Tab and Slot-Slot5 2 outline → Tab and Slot-Slot5 2 (cut)
    with BuildSketch(Plane(origin=(0, 0, 0), x_dir=(1, 0, 0), z_dir=(0, 1, 0)).offset(TAB_START_9)):
        Polygon((3, 3.1), (1.28e-07, 3.1), (0, 0), (3, 0), align=None)
    extrude(amount=TAB_AND_SLOT_SLOT5_2_DEPTH, mode=Mode.SUBTRACT)

    # Tab and Slot-Slot5 3 outline → Tab and Slot-Slot5 3 (cut)
    with BuildSketch(Plane(origin=(0, 0, 0), x_dir=(1, 0, 0), z_dir=(0, 1, 0)).offset(TAB_START_10)):
        Polygon((3, 3.1), (1.28e-07, 3.1), (0, 0), (3, 0), align=None)
    extrude(amount=TAB_AND_SLOT_SLOT5_3_DEPTH, mode=Mode.SUBTRACT)

    # Tab and Slot-Slot5 4 outline → Tab and Slot-Slot5 4 (cut)
    with BuildSketch(Plane(origin=(0, 0, 0), x_dir=(1, 0, 0), z_dir=(0, 1, 0)).offset(TAB_START_11)):
        Polygon((3, 3.1), (1.28e-07, 3.1), (0, 0), (3, 0), align=None)
    extrude(amount=TAB_AND_SLOT_SLOT5_4_DEPTH, mode=Mode.SUBTRACT)

    # Tab and Slot-Slot5 5 outline → Tab and Slot-Slot5 5 (cut)
    with BuildSketch(Plane(origin=(0, 0, 0), x_dir=(1, 0, 0), z_dir=(0, 1, 0)).offset(TAB_START_12)):
        Polygon((3, 3.1), (1.28e-07, 3.1), (0, 0), (3, 0), align=None)
    extrude(amount=TAB_AND_SLOT_SLOT5_5_DEPTH, mode=Mode.SUBTRACT)

    # Tab and Slot-Slot5 6 outline → Tab and Slot-Slot5 6 (cut)
    with BuildSketch(Plane(origin=(0, 0, 0), x_dir=(1, 0, 0), z_dir=(0, 1, 0)).offset(TAB_START_13)):
        Polygon((3, 3.1), (1.28e-07, 3.1), (0, 0), (3, 0), align=None)
    extrude(amount=TAB_AND_SLOT_SLOT5_6_DEPTH, mode=Mode.SUBTRACT)

    # Tab and Slot-Slot5 7 outline → Tab and Slot-Slot5 7 (cut)
    with BuildSketch(Plane(origin=(0, 0, 0), x_dir=(1, 0, 0), z_dir=(0, 1, 0)).offset(TAB_START_14)):
        Polygon((3, 3.1), (1.28e-07, 3.1), (0, 0), (3, 0), align=None)
    extrude(amount=TAB_AND_SLOT_SLOT5_7_DEPTH, mode=Mode.SUBTRACT)


solid = part.part
